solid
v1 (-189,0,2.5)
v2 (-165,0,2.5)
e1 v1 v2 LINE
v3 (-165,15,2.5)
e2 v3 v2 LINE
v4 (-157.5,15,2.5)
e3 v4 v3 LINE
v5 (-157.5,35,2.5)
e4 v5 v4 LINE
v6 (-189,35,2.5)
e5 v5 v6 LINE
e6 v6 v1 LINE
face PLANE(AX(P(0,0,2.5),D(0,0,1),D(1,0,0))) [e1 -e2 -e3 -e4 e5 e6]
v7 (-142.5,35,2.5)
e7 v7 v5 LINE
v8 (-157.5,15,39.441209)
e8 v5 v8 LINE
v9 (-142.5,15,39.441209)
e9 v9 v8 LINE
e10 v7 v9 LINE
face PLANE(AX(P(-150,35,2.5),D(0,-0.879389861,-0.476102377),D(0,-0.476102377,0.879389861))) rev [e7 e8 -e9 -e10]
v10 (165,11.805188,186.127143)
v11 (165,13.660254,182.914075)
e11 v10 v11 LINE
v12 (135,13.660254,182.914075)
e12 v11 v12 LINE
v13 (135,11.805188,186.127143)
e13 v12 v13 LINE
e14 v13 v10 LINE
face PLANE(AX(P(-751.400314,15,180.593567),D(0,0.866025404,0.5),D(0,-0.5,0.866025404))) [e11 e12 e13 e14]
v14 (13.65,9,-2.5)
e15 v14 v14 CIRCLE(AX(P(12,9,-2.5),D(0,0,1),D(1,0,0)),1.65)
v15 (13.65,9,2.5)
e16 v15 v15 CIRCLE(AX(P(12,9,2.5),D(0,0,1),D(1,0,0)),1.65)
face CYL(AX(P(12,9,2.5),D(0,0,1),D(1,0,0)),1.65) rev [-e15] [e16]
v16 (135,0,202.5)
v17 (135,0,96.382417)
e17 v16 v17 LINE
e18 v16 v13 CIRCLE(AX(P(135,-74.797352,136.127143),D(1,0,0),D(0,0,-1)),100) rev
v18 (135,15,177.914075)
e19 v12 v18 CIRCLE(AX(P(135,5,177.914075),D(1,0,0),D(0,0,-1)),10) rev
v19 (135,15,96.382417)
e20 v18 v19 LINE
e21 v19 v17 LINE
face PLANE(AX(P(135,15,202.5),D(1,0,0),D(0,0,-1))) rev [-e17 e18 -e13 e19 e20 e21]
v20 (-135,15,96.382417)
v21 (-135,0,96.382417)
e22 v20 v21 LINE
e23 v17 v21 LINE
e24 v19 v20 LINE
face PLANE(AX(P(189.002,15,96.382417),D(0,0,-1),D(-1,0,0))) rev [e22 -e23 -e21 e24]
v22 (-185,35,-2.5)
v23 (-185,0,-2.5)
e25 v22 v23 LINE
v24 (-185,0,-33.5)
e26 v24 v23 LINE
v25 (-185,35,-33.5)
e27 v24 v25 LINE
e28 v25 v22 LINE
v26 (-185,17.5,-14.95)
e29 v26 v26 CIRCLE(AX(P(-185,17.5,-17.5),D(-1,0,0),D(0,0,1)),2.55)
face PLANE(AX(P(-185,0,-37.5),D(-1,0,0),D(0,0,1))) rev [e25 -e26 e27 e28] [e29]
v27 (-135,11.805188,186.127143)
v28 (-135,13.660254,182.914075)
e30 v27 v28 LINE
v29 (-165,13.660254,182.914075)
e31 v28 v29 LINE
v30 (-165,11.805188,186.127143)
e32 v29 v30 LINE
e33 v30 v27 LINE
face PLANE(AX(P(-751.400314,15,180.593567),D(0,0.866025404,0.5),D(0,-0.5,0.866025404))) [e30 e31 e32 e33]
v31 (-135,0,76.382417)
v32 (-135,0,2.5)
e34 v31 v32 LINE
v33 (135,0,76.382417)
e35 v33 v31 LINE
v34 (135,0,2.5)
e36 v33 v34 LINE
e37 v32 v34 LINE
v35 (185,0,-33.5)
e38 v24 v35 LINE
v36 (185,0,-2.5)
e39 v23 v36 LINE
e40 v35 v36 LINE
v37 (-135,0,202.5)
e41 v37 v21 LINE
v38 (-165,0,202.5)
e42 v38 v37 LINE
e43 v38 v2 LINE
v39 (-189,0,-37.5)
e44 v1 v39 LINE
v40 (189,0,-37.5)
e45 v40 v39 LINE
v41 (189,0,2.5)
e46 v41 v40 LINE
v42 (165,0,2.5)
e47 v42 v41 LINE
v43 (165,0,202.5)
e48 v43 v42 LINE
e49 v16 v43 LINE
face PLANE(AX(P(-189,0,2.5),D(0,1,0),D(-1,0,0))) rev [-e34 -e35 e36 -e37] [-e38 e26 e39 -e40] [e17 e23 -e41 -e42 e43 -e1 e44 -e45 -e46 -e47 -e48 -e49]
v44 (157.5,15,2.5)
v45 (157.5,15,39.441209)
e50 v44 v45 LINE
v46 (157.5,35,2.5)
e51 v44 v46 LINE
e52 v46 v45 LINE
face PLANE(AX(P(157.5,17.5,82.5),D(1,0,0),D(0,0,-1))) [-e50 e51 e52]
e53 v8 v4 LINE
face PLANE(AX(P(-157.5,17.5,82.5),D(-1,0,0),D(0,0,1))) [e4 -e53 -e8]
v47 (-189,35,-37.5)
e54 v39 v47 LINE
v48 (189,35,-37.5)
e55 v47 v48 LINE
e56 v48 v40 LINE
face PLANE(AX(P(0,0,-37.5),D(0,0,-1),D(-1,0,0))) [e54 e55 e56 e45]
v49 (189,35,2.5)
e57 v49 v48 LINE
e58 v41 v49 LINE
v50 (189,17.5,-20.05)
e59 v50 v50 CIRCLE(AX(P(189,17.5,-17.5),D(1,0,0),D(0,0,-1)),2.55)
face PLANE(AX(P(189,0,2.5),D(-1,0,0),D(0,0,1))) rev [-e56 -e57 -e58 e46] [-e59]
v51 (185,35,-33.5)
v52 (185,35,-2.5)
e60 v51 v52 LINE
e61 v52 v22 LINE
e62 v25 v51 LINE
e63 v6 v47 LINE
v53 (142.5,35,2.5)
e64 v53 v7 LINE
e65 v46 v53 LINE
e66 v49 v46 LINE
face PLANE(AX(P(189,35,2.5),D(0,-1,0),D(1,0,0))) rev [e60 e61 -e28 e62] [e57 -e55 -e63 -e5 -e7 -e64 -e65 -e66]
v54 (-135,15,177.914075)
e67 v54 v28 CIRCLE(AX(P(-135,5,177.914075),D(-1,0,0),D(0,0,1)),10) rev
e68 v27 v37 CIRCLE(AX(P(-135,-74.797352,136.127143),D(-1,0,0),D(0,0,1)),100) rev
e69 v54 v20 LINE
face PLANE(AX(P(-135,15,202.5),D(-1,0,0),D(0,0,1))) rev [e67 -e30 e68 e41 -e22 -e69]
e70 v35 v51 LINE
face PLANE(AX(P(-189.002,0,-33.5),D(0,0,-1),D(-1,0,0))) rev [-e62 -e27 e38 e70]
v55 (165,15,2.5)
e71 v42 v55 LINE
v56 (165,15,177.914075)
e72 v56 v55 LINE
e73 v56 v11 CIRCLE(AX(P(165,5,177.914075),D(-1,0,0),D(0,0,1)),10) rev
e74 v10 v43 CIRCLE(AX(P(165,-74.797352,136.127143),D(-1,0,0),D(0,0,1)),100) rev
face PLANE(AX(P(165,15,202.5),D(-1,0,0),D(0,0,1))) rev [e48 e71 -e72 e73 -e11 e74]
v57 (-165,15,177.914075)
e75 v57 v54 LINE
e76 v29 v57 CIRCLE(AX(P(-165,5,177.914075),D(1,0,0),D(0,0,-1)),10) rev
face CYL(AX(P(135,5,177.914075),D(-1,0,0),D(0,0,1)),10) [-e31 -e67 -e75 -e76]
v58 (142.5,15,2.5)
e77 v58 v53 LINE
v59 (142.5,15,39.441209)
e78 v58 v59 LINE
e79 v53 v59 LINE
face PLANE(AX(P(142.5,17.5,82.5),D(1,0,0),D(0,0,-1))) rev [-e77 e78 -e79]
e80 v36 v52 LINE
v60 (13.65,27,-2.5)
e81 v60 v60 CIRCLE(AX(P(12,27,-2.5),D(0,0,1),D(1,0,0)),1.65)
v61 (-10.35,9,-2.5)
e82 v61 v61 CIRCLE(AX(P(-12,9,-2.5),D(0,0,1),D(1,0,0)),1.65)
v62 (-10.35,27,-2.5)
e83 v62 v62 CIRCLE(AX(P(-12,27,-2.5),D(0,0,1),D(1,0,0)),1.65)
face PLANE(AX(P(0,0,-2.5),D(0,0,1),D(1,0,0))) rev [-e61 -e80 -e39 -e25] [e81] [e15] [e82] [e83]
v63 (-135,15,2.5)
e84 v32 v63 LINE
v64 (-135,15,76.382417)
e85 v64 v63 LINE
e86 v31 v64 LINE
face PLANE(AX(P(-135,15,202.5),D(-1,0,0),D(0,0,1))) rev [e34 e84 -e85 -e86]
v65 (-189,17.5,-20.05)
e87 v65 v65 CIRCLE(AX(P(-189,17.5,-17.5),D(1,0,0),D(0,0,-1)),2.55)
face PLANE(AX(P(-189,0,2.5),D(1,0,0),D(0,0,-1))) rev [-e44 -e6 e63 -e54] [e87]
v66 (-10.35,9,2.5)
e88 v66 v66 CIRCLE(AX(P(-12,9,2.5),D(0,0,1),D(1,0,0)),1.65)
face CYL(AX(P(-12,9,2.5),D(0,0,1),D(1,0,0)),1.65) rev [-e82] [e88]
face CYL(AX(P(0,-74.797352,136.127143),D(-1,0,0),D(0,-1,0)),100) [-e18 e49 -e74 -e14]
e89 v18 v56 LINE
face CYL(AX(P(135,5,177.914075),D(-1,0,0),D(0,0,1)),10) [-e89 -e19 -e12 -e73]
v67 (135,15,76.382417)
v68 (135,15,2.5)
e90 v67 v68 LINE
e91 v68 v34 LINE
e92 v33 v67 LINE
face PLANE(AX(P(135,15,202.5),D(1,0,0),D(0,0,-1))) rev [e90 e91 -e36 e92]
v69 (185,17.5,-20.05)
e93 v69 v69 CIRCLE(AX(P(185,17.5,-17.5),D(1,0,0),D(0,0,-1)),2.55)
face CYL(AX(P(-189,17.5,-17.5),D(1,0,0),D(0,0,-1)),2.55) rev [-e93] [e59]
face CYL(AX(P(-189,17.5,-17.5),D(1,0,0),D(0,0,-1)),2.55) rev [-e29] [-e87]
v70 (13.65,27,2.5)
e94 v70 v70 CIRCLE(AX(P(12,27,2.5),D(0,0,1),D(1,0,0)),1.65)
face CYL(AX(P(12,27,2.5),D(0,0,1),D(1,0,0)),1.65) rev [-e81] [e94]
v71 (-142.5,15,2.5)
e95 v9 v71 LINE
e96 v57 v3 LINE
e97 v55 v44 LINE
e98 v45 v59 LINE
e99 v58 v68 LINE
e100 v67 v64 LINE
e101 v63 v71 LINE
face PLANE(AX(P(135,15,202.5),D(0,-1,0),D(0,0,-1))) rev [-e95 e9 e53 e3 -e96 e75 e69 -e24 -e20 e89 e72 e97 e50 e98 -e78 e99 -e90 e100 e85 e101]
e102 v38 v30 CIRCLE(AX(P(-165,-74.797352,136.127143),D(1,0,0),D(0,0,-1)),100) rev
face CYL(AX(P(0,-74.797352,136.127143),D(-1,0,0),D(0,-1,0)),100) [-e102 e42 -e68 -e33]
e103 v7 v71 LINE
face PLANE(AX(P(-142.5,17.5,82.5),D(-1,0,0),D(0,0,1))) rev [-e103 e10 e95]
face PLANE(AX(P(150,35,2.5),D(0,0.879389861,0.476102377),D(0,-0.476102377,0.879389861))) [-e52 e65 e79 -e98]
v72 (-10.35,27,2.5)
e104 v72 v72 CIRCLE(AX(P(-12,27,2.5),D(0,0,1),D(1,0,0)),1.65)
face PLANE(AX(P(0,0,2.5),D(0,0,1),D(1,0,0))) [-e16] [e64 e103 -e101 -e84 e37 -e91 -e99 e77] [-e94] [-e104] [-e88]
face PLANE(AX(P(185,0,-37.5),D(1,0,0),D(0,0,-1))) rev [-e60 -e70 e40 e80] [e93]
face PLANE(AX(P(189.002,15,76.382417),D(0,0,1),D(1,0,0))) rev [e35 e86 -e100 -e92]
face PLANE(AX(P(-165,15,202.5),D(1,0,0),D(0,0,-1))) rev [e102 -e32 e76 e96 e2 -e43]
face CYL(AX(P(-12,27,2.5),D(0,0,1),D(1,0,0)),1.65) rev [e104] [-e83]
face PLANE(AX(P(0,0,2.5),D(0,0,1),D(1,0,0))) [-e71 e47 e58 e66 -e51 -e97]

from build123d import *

# Parameters (mm, degrees)
SKETCH_1_W               = 378
SKETCH_1_H               = 35
EXTRUDE_1_DEPTH          = 2.5
SKETCH_3_W               = 4
SKETCH_3_H               = 35
EXTRUDE_2_DEPTH          = 35
SKETCH_4_R               = 2.55
CUT_EXTRUDE_3_DEPTH      = 382.464611727
HOLE_WIZARD_M4_6_D       = 3.3
SKETCH_6_W               = 30
SKETCH_6_H               = 15
EXTRUDE_3_DEPTH          = 200
EXTRUDE_4_REACH          = 385.676
SKETCH_15_W              = 20
SKETCH_15_H              = 15
EXTRUDE_5_REACH          = 428.74
SKETCH_17_W              = 4
SKETCH_17_H              = 35
SKETCH_18_W              = 4
SKETCH_18_H              = 35
EXTRUDE_6_DEPTH          = 185
CUT_EXTRUDE_4_DEPTH      = 410.325359586
CUT_EXTRUDE_4_DEPTH_BACK = 410.325359586
FILLET_1_R               = 100
FILLET_2_R               = 10
RIB_6_REACH              = 398.424
SKETCH_20_WALL_W         = 836.856433298
SKETCH_20_WALL_H         = 15


with BuildPart() as part:
    # 草图1 → 凸台-拉伸1 (new, symmetric)
    with BuildSketch(Plane.XY):
        with Locations((0, 17.5)):
            Rectangle(SKETCH_1_W, SKETCH_1_H)
    extrude(amount=EXTRUDE_1_DEPTH, both=True)

    # 草图3 → 凸台-拉伸2 (add)
    with BuildSketch(Plane(origin=(0, 0, -2.5), x_dir=(-1, 0, 0), z_dir=(0, 0, -1))):
        with Locations((-187, 17.5)):
            Rectangle(SKETCH_3_W, SKETCH_3_H)
        with Locations((187, 17.5)):
            Rectangle(SKETCH_3_W, SKETCH_3_H)
    extrude(amount=EXTRUDE_2_DEPTH)

    # 草图4 → 切除-拉伸3 (cut, through all)
    with BuildSketch(Plane(origin=(189, 0, 0), x_dir=(0, 0, -1), z_dir=(1, 0, 0))):
        with Locations((17.5, 17.5)):
            Circle(SKETCH_4_R)
    extrude(amount=-CUT_EXTRUDE_3_DEPTH, mode=Mode.SUBTRACT)

    # M4 螺纹孔的螺纹孔钻头6 (through all)
    with Locations(Plane.XY.offset(2.5)):
        with Locations((12, 27), (-12, 9), (-12, 27), (12, 9)):
            Hole(HOLE_WIZARD_M4_6_D / 2)

    # 草图6 → 凸台-拉伸3 (add)
    with BuildSketch(Plane.XY.offset(2.5)):
        with Locations((-150, 7.5)):
            Rectangle(SKETCH_6_W, SKETCH_6_H)
        with Locations((150, 7.5)):
            Rectangle(SKETCH_6_W, SKETCH_6_H)
    extrude(amount=EXTRUDE_3_DEPTH)

    # 草图15 → 凸台-拉伸4 (add, up to next)
    with BuildSketch(Plane(origin=(-135, 0, 0), x_dir=(0, 0, -1), z_dir=(1, 0, 0)), mode=Mode.PRIVATE) as extrude_4_sk1:
        with Locations((-86.382417222, 7.5)):
            Rectangle(SKETCH_15_W, SKETCH_15_H)
    extrude_4_tool1 = extrude(extrude_4_sk1.sketch, amount=EXTRUDE_4_REACH, mode=Mode.PRIVATE) - part.part
    add(extrude_4_tool1.solids().sort_by_distance((-135, 7.5, 86.382417))[0])

    # 草图17 → 凸台-拉伸5 (add, up to next)
    with BuildSketch(Plane.ZY.offset(-185), mode=Mode.PRIVATE) as extrude_5_sk1:
        with Locations((-35.5, 17.5)):
            Rectangle(SKETCH_17_W, SKETCH_17_H)
    extrude_5_tool1 = extrude(extrude_5_sk1.sketch, amount=EXTRUDE_5_REACH, mode=Mode.PRIVATE) - part.part
    add(extrude_5_tool1.solids().sort_by_distance((185, 17.5, -35.5))[0])

    # 草图18 → 凸台-拉伸6 (add)
    with BuildSketch(Plane(origin=(-185, 0, 0), x_dir=(0, 0, -1), z_dir=(1, 0, 0))):
        with Locations((35.5, 17.5)):
            Rectangle(SKETCH_18_W, SKETCH_18_H)
    extrude(amount=EXTRUDE_6_DEPTH)

    # 草图19 → 切除-拉伸4 (cut, two sides: drawn at the far end of the back side and taken through both)
    with BuildSketch(Plane.ZY.offset(165).offset(-CUT_EXTRUDE_4_DEPTH_BACK)):
        Polygon((-247.587382518, 262.210386508), (180.593567073, 15), (202.5, 2.352315052), (630.680949591, -244.858071456), (1125.101722607, 611.503827726), (246.833390498, 1118.57228569), align=None)
    extrude(amount=CUT_EXTRUDE_4_DEPTH + CUT_EXTRUDE_4_DEPTH_BACK, mode=Mode.SUBTRACT)

    # 圆角1
    # the kernel refuses this fillet: 100 mm, written as the material it takes off along each edge
    with BuildSketch(Plane(origin=(-212.264366854, 2.352315052, 202.5), x_dir=(0, -1, 0), z_dir=(1, 0, 0)), Plane(origin=(87.735633146, 2.352315052, 202.5), x_dir=(0, -1, 0), z_dir=(1, 0, 0))) as fillet_1_piece_1:
        with BuildLine():
            CenterArc((77.149667008, 66.372856956), FILLET_1_R, 210, 11.584858497)
            Line((-9.452873371, 16.372856956), (-11.184924178, 15.372856956))
            Line((-11.184924178, 15.372856956), (-1.732050808, -1))
            Line((-1.732050808, -1), (0, -2))
            ThreePointArc((0, -2), (1.176157526, -2), (0.856368013, -1.327457139))
            Line((0.856368013, -1.327457139), (2.352315052, 0))
        make_face()
    extrude(amount=124.528733709, mode=Mode.SUBTRACT)

    # 圆角2
    fillet_2_edges = [part.edges().sort_by_distance(p)[0] for p in [
        (150, 15, 180.593567073),
        (-150, 15, 180.593567073),
    ]]
    fillet(fillet_2_edges, radius=FILLET_2_R)

    # 草图20 wall → 筋6 (add, up to next)
    with BuildSketch(Plane(origin=(150, 25, 20.970604306), x_dir=(0, -0.476102376571, 0.879389860655), z_dir=(0, -0.879389860655, -0.476102376571)), mode=Mode.PRIVATE) as rib_6_sk1:
        Rectangle(SKETCH_20_WALL_W, SKETCH_20_WALL_H)
    rib_6_tool1 = extrude(rib_6_sk1.sketch, amount=RIB_6_REACH, mode=Mode.PRIVATE) - part.part
    rib_6 = rib_6_tool1.solids().sort_by_distance((150, 25, 20.970604306))[0]
    add(rib_6)

    # 镜向1: 筋6 across plane
    add(rib_6.mirror(Plane(origin=(0, 0, 0), x_dir=(0, 0, 1), z_dir=(1, 0, 0))))


solid = part.part
